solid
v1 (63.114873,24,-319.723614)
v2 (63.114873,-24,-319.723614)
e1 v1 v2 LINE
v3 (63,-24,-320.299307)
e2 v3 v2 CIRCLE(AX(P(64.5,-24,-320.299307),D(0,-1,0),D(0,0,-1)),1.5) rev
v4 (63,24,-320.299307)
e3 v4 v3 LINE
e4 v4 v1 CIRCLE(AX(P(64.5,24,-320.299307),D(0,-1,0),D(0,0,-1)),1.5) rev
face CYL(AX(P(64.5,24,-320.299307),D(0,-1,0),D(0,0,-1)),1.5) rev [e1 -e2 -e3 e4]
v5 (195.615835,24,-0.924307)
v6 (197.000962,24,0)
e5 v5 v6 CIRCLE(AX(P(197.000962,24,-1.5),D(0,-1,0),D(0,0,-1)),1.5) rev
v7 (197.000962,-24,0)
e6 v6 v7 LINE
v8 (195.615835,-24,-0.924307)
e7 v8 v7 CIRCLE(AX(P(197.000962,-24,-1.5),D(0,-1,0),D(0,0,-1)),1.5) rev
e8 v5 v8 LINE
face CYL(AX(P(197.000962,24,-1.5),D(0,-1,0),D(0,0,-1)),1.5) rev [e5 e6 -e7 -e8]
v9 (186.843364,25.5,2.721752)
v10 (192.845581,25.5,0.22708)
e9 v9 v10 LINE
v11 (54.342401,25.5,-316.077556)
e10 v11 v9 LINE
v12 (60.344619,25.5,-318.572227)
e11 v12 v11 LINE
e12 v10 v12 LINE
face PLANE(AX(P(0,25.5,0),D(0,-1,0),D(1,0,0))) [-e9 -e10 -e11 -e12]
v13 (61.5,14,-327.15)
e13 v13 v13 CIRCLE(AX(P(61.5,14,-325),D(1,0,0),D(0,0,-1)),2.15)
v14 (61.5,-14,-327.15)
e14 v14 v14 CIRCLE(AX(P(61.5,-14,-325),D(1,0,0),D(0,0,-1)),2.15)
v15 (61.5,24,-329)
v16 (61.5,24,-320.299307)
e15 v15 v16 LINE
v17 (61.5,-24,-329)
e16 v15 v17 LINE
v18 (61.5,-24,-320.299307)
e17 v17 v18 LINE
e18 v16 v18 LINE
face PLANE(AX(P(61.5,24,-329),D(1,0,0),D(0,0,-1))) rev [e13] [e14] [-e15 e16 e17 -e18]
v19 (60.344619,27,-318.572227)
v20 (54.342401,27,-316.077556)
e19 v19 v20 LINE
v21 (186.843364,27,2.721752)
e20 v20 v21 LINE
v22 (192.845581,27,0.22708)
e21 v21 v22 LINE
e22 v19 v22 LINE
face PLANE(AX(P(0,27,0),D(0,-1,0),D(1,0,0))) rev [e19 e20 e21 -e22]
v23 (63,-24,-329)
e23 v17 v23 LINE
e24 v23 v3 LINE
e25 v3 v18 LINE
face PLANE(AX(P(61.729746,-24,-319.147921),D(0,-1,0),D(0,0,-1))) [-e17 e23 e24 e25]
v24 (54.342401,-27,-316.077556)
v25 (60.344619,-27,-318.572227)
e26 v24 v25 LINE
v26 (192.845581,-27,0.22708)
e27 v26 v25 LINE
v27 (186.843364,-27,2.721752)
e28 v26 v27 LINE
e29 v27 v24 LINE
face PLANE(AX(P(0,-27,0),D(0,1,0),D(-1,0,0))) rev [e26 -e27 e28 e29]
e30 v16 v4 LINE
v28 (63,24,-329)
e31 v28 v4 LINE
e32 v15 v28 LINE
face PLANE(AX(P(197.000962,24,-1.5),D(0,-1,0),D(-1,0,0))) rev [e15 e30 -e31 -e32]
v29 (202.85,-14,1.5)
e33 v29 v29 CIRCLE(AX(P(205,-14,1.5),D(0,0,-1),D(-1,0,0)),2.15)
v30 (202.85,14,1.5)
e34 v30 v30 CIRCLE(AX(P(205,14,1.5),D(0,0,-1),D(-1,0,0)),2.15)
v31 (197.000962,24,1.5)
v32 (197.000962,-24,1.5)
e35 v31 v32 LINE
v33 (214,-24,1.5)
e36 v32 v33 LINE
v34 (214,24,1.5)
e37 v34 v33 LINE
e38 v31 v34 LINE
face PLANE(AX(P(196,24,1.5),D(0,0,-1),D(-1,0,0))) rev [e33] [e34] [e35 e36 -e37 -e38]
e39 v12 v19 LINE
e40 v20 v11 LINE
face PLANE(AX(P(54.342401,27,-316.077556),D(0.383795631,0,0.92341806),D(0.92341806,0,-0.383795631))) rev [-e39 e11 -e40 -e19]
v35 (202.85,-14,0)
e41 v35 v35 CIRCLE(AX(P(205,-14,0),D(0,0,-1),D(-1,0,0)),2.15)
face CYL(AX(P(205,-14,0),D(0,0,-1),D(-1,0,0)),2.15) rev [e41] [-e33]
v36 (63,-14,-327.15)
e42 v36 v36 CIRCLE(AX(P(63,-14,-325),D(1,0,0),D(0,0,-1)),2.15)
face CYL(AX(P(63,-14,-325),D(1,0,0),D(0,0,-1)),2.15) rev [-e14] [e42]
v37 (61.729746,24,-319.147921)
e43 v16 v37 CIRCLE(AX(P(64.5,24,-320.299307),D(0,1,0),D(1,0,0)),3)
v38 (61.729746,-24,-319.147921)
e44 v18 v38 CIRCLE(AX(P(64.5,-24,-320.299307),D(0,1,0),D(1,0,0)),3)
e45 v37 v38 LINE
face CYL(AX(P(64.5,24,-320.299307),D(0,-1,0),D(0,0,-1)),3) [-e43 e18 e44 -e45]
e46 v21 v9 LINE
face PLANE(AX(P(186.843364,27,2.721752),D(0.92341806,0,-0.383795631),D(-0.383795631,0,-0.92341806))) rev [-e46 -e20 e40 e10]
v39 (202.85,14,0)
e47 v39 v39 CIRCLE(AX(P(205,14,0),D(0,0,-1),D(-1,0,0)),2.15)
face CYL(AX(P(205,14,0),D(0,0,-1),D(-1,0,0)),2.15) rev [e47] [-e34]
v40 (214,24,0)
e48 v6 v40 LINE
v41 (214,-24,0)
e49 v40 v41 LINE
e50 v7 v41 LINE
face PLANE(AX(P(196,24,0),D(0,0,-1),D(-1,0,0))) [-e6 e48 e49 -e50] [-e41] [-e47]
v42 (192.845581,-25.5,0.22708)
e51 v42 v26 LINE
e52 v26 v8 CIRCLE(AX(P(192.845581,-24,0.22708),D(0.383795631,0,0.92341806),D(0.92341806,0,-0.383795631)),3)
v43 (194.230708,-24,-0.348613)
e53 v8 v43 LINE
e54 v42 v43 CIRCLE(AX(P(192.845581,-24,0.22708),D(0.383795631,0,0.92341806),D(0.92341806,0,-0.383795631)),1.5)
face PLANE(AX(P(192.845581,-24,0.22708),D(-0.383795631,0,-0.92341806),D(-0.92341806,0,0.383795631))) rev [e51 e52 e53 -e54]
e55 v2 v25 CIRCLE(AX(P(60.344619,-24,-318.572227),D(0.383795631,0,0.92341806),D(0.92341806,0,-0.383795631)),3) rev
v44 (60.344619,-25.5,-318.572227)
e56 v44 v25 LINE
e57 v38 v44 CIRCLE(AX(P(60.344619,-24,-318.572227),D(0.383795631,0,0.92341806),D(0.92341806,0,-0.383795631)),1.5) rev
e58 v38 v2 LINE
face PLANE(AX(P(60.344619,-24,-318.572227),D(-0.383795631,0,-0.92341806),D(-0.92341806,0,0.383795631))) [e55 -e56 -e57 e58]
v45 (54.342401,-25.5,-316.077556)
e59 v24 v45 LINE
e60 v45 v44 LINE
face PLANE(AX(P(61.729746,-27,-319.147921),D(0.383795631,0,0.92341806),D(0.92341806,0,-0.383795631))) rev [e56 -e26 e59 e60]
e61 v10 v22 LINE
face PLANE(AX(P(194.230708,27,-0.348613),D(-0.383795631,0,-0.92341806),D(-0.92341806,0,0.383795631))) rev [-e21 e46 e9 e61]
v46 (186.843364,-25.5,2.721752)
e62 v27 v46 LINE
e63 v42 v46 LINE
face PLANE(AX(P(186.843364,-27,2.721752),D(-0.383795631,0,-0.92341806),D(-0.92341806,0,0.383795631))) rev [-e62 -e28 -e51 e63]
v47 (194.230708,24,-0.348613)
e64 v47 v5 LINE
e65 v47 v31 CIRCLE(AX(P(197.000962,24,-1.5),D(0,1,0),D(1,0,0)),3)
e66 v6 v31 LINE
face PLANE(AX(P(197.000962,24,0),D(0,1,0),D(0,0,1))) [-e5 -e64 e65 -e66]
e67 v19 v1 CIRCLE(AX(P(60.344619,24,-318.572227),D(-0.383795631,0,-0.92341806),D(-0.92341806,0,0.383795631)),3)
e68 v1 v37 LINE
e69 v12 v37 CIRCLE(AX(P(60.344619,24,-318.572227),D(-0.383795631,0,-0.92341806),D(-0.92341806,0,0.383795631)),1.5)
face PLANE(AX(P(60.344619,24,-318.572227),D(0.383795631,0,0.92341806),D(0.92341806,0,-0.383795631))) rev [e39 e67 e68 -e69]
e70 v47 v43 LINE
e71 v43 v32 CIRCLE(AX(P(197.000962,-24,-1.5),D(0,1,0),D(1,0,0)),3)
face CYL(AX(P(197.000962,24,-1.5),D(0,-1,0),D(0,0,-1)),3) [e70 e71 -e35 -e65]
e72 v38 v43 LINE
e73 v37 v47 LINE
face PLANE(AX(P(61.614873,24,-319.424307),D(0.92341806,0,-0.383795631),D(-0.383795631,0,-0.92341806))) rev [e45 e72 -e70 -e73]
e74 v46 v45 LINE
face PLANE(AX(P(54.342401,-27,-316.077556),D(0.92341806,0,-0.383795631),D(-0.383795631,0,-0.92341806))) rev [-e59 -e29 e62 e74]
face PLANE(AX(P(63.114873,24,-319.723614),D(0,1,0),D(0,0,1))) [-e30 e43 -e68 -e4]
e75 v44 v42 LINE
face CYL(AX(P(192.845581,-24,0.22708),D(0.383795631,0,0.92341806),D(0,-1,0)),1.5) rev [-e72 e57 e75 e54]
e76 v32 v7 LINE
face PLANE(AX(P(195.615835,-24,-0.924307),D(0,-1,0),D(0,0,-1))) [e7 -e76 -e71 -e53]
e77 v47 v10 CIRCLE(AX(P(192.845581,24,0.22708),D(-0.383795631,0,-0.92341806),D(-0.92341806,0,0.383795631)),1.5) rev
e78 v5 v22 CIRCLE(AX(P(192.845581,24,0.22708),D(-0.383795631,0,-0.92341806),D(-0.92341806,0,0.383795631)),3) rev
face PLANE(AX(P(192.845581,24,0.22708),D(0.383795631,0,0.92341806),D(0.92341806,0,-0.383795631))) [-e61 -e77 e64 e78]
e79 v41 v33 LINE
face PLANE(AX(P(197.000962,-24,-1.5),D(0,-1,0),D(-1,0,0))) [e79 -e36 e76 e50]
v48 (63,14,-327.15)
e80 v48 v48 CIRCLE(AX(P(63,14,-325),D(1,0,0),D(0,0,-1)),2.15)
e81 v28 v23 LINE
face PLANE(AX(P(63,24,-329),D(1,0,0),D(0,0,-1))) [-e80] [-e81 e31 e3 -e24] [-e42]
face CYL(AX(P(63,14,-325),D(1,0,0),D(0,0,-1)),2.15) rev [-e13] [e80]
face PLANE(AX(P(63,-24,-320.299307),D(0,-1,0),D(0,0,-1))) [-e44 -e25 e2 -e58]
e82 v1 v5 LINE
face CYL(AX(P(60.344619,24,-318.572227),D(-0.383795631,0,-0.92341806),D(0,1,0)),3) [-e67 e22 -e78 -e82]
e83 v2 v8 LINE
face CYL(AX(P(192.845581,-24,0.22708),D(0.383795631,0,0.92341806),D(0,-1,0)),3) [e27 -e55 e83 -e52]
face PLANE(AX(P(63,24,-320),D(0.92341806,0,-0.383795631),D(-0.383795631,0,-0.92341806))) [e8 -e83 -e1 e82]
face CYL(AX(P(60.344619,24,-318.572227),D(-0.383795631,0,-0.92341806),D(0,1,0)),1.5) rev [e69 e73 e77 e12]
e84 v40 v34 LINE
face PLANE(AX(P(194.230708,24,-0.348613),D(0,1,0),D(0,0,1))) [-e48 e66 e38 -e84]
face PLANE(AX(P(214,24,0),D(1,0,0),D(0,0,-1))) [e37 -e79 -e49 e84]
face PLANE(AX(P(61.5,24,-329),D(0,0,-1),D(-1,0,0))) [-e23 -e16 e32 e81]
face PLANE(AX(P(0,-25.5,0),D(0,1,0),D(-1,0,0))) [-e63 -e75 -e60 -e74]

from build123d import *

# Parameters (mm, degrees)
SM_BASE_FLANGE_1_DEPTH      = 24
SM_EDGE_FLANGE_1_DEPTH      = 345.238328462
SM_EDGE_FLANGE_1_BEND_DEPTH = 345.238328462
HOLE_WIZARD_M4_3_D          = 4.3
HOLE_WIZARD_M4_4_D          = 4.3


# Sheet-metal steps are written as plain solids
with BuildPart() as part:
    # Sketch 1 → 基体-法兰1 (new, symmetric)
    with BuildSketch(Plane(origin=(0, 0, 0), x_dir=(1, 0, 0), z_dir=(0, 1, 0))):
        with BuildLine():
            Line((63, 329), (63, 320.299307498))
            ThreePointArc((63, 320.299307498), (63.028998532, 320.005786319), (63.11487291, 319.723614051))
            Line((63.11487291, 319.723614051), (195.615835089, 0.924306553))
            ThreePointArc((195.615835089, 0.924306553), (196.168357882, 0.252294071), (197.000962179, 0))
            Line((197.000962179, 0), (214, 0))
            Line((214, 0), (214, -1.5))
            Line((214, -1.5), (197.000962179, -1.5))
            ThreePointArc((197.000962179, -1.5), (195.335753585, -0.995411858), (194.230707999, 0.348613106))
            Line((194.230707999, 0.348613106), (61.72974582, 319.147920604))
            ThreePointArc((61.72974582, 319.147920604), (61.557997065, 319.71226514), (61.5, 320.299307498))
            Line((61.5, 320.299307498), (61.5, 329))
            Line((61.5, 329), (63, 329))
        make_face()
    extrude(amount=SM_BASE_FLANGE_1_DEPTH, both=True)

    # 边线-法兰1 section (across the edge) → 边线-法兰1 (add)
    with BuildSketch(Plane(origin=(194.230707999, 25.5, -0.348613106), x_dir=(0, -1, 0), z_dir=(-0.3837956311773727, 0, -0.9234180599756332))):
        with BuildLine():
            Line((-1.5, 1.5), (-1.5, 8))
            Line((-1.5, 8), (0, 8))
            Line((0, 8), (0, 1.5))
            ThreePointArc((0, 1.5), (0.439339828, 0.439339828), (1.5, 0))
            Line((1.5, 0), (1.5, -1.5))
            ThreePointArc((1.5, -1.5), (-0.621320344, -0.621320344), (-1.5, 1.5))
        make_face()
    extrude(amount=SM_EDGE_FLANGE_1_DEPTH)

    # 边线-法兰1 section 2 (across the edge) → 边线-法兰1 bend (add)
    with BuildSketch(Plane(origin=(61.72974582, -25.5, -319.147920604), x_dir=(0, 1, 0), z_dir=(0.3837956311773727, 0, 0.9234180599756332))):
        with BuildLine():
            Line((-1.5, 1.5), (-1.5, 8))
            Line((-1.5, 8), (0, 8))
            Line((0, 8), (0, 1.5))
            ThreePointArc((0, 1.5), (0.439339828, 0.439339828), (1.5, 0))
            Line((1.5, 0), (1.5, -1.5))
            ThreePointArc((1.5, -1.5), (-0.621320344, -0.621320344), (-1.5, 1.5))
        make_face()
    extrude(amount=SM_EDGE_FLANGE_1_BEND_DEPTH)

    # M4 间隙槽口3 (through all)
    with Locations(Plane(origin=(63, 0, 0), x_dir=(0, 0, -1), z_dir=(1, 0, 0))):
        with Locations((325, 14), (325, -14)):
            Hole(HOLE_WIZARD_M4_3_D / 2)

    # M4 间隙槽口4 (through all)
    with Locations(Plane(origin=(0, 0, 0), x_dir=(-1, 0, 0), z_dir=(0, 0, -1))):
        with Locations((-205, 14), (-205, -14)):
            Hole(HOLE_WIZARD_M4_4_D / 2)


solid = part.part
